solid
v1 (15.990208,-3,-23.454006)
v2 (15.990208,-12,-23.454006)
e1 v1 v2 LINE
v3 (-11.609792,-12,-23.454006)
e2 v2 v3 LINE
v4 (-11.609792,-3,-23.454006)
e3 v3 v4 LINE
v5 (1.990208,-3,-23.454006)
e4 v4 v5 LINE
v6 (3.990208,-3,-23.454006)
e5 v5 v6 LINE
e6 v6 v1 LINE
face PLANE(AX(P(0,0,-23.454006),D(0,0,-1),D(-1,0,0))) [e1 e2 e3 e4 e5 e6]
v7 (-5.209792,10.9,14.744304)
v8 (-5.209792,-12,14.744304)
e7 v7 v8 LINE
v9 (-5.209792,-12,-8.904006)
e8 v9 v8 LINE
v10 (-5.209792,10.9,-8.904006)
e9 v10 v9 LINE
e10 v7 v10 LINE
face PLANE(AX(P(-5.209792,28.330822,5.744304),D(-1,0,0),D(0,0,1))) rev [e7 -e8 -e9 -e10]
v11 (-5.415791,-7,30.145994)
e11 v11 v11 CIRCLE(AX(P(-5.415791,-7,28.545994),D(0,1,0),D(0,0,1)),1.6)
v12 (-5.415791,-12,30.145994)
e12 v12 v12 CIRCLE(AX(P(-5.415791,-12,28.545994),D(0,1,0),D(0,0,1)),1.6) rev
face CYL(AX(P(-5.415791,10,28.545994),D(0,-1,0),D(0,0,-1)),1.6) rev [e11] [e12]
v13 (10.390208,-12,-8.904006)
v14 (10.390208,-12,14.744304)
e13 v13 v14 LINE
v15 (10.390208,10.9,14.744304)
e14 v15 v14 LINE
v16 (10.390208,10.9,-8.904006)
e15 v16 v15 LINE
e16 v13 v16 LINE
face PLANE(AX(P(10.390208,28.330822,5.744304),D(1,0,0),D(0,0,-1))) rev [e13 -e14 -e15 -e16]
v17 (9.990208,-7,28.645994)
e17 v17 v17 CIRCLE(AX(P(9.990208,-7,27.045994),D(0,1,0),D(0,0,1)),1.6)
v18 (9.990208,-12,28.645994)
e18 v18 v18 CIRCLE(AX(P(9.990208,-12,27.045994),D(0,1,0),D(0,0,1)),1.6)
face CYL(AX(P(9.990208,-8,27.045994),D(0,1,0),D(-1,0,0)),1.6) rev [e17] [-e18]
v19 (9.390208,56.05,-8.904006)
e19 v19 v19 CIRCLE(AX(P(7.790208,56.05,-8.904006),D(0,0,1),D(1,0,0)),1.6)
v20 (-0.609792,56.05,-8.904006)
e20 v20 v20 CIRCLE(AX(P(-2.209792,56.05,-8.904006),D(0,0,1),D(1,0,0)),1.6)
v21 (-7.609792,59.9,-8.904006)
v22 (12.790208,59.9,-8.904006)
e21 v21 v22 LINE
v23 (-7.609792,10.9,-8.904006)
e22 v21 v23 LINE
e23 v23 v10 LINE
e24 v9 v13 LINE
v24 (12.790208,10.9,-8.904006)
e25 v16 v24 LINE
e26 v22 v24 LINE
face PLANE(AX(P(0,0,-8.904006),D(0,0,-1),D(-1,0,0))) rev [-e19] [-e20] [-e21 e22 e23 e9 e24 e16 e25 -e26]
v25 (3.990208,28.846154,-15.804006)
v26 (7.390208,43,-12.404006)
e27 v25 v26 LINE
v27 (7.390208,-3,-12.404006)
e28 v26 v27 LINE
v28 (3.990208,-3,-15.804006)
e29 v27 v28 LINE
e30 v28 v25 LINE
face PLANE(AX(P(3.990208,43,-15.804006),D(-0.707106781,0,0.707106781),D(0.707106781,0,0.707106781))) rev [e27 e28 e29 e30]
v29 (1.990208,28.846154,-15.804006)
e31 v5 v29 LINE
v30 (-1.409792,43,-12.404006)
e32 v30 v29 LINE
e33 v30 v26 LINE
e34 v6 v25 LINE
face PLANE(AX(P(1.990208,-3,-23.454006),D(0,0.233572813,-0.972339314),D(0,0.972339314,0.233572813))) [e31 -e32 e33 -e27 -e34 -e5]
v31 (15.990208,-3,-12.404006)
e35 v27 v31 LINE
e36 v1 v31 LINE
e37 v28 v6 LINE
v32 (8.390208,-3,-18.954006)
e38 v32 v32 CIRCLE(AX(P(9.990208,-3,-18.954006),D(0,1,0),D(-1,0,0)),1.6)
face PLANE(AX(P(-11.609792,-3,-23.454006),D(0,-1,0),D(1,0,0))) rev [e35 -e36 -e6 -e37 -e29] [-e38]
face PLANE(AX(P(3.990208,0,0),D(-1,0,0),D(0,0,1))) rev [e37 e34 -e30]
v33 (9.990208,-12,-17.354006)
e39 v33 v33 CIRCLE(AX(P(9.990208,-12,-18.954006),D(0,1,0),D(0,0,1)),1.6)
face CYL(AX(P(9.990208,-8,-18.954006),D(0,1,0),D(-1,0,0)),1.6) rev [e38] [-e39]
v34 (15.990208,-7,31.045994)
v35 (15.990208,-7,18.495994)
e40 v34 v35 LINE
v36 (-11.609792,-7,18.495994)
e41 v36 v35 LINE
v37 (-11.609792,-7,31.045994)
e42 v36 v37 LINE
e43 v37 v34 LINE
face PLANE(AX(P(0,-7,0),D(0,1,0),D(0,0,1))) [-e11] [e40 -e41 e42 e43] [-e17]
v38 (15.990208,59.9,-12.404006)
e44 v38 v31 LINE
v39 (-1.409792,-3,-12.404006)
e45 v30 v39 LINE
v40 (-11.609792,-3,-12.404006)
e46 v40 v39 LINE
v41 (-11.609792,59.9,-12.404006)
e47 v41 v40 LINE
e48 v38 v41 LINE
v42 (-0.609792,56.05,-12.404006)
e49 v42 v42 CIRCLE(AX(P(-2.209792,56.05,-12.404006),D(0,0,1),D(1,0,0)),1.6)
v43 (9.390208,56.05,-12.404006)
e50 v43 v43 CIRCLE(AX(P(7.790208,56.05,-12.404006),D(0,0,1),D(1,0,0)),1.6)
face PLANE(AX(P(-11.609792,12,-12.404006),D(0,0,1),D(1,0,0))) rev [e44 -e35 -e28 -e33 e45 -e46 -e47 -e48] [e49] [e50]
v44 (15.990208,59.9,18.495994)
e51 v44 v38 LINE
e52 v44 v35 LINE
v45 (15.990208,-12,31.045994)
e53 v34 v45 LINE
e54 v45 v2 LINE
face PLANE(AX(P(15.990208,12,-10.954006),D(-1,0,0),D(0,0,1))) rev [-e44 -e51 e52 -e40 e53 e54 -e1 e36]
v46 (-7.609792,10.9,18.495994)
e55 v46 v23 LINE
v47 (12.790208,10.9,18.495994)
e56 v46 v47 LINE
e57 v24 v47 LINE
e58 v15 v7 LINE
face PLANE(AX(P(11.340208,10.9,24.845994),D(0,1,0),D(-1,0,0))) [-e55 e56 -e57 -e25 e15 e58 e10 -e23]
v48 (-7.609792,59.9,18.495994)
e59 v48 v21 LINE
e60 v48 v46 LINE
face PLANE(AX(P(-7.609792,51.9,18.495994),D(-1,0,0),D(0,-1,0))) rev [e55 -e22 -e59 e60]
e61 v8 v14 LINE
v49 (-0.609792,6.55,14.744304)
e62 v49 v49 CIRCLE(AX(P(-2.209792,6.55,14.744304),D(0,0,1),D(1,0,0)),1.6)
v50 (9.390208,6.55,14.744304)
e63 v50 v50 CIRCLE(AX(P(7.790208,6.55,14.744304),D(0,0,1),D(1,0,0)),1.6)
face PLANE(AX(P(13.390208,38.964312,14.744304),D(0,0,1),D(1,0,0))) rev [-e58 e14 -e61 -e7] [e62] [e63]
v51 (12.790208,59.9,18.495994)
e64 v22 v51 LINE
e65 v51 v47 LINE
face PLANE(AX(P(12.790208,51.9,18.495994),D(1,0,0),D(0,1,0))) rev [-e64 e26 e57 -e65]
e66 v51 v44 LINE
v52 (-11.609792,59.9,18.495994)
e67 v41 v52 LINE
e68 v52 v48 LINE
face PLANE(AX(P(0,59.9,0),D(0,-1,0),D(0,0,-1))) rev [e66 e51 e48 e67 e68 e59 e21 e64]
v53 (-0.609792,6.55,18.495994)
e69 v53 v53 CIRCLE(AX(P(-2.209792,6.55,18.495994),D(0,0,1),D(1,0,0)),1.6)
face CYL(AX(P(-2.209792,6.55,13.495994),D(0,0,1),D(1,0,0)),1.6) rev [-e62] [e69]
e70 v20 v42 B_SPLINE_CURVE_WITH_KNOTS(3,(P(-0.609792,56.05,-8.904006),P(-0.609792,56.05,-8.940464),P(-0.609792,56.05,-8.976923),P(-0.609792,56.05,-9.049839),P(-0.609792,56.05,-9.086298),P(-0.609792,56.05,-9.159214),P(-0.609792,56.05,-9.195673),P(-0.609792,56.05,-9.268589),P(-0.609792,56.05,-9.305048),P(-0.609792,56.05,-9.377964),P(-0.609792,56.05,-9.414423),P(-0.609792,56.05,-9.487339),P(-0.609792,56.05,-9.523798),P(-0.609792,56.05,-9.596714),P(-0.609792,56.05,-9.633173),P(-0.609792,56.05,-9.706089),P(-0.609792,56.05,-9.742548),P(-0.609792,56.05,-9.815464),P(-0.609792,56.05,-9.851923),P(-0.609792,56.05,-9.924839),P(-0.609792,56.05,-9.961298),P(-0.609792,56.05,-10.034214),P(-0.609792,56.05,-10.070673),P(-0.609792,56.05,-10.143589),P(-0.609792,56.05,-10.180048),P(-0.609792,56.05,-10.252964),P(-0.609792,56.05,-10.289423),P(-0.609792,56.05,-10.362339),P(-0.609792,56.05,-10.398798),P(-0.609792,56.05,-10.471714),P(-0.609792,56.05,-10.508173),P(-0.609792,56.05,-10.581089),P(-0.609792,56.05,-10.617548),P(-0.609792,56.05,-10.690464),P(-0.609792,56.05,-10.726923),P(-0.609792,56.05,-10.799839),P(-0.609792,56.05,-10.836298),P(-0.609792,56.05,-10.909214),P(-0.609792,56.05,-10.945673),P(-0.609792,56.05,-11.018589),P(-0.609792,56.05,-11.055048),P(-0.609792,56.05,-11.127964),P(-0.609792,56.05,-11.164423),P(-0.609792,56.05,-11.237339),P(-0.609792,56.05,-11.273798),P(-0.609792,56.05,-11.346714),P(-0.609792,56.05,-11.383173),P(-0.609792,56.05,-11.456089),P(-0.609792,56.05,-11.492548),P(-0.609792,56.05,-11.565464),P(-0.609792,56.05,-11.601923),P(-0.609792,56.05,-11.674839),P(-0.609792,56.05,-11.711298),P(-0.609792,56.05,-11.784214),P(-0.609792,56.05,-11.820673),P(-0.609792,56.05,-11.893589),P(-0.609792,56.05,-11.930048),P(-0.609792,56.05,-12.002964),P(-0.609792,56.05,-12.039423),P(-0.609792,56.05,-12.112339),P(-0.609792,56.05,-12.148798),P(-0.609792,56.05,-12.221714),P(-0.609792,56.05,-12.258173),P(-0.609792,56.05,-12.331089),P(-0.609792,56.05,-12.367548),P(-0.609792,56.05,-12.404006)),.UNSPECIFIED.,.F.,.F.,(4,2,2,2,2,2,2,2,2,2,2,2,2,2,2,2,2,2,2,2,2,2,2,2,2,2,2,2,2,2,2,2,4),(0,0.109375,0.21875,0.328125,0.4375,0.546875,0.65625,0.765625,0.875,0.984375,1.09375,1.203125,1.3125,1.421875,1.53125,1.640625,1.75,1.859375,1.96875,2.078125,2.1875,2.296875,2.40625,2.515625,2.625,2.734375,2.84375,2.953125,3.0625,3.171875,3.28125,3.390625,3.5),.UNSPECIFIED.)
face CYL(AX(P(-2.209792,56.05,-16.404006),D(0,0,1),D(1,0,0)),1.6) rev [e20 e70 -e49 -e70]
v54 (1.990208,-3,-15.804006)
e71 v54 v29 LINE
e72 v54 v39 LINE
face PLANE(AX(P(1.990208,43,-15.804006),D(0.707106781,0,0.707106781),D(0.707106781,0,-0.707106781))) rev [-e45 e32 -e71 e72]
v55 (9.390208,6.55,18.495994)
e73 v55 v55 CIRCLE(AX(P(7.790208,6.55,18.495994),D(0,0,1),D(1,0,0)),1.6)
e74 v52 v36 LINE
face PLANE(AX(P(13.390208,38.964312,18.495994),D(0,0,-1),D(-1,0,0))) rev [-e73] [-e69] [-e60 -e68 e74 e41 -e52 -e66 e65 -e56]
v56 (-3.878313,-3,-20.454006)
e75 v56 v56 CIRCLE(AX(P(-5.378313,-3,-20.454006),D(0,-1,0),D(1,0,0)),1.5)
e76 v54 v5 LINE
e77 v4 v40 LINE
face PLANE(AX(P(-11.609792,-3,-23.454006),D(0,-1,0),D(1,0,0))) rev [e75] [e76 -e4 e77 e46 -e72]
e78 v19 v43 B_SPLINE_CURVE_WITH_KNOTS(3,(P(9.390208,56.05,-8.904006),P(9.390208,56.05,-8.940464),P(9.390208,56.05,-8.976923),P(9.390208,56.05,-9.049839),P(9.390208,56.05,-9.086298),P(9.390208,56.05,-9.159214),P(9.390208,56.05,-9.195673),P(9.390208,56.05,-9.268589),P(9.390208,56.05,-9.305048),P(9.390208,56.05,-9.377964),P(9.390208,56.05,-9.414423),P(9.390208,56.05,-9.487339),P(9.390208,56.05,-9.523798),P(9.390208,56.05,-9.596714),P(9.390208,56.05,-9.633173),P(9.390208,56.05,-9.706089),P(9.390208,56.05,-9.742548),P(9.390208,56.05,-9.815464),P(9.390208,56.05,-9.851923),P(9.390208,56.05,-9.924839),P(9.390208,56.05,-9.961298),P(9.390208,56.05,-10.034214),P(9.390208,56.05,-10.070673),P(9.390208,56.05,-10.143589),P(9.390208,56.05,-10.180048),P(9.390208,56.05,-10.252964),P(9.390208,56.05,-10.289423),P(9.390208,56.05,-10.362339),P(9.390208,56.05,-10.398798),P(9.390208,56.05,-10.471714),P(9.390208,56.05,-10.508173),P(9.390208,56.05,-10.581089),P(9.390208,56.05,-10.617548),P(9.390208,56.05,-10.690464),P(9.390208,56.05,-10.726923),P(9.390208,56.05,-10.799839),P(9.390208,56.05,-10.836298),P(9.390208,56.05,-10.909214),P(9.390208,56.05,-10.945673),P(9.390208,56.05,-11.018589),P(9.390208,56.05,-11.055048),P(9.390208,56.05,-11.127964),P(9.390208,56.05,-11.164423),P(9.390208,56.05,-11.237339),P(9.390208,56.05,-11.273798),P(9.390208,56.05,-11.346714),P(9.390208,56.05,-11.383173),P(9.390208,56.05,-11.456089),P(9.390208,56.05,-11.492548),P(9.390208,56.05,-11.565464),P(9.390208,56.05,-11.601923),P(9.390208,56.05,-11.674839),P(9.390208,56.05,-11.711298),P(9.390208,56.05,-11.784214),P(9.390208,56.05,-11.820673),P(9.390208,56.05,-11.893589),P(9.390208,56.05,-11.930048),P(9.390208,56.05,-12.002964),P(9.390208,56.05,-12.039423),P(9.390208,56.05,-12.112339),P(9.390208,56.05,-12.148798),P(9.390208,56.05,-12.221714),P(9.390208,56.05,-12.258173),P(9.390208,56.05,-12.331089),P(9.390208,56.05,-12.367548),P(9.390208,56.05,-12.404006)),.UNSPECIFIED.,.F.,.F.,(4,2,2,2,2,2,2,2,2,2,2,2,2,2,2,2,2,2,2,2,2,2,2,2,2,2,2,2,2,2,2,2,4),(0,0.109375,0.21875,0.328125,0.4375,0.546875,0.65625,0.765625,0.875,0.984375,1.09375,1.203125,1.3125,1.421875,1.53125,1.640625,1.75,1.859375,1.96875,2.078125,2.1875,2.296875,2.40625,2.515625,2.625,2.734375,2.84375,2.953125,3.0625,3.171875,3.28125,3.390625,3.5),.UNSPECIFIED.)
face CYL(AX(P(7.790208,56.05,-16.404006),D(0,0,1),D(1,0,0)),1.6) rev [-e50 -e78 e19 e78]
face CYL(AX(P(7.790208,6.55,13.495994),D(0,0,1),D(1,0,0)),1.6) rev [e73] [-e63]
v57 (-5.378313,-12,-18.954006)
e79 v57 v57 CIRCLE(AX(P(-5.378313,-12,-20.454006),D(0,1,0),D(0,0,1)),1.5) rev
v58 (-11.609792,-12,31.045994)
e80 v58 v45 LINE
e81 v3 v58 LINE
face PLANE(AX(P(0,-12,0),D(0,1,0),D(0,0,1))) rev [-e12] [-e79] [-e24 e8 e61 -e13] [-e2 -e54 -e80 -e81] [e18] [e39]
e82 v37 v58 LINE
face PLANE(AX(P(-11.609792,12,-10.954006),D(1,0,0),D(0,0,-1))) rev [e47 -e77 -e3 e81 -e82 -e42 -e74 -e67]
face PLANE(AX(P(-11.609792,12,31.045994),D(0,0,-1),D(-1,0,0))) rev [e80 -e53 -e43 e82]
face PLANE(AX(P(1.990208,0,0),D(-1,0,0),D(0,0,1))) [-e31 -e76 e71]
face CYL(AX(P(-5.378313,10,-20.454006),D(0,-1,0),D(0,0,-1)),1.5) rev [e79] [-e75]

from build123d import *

# Parameters (mm, degrees)
SKETCH1_W               = 25
SKETCH1_H               = 17
BOSS_EXTRUDE1_DEPTH     = 12
MOVE_FACE1_BY           = 15
MOVE_FACE3_BY           = 8
SKETCH3_W               = 25
SKETCH3_H               = 12.751689795
BOSS_EXTRUDE2_DEPTH     = 6.9
SKETCH4_W               = 5
SKETCH4_H               = 16.698310205
BOSS_EXTRUDE3_DEPTH     = 6.9
MOVE_START              = -11.609792285
MOVE_FACE4_OUTLINE_W    = 6.9
MOVE_FACE4_OUTLINE_H    = 16.698310205
MOVE_FACE4_DEPTH        = 2.4
MOVE_FACE5_BY           = 20
SKETCH6_W               = 25
SKETCH6_H               = 10.9
BOSS_EXTRUDE5_DEPTH     = 2
MOVE_FACE6_BY           = 1.5
MOVE_FACE7_BY           = 2.6
SKETCH7_W               = 3.8
SKETCH7_H               = 30.95
BOSS_EXTRUDE6_DEPTH     = 41
SKETCH8_W               = 16.2
SKETCH8_H               = 3.5
BOSS_EXTRUDE7_DEPTH     = 41
SKETCH9_W               = 3
SKETCH9_H               = 30.95
BOSS_EXTRUDE8_DEPTH     = 41
SKETCH10_W              = 4.6
SKETCH10_H              = 3.5
BOSS_EXTRUDE9_DEPTH     = 41
MOVE_FACE8_BY           = 9
MOVE_FACE9_OUTLINE_W    = 6
MOVE_FACE9_OUTLINE_H    = 6.301689795
MOVE_FACE9_OUTLINE_H_2  = 3.5
MOVE_FACE9_DEPTH        = 27.6
MOVE_START_2            = 8.390207715
MOVE_FACE9_2_OUTLINE_W  = 6
MOVE_FACE9_2_OUTLINE_H  = 23.698310205
MOVE_FACE9_2_DEPTH      = 7.6
MOVE_FACE9_3_OUTLINE_W  = 6
MOVE_FACE9_3_OUTLINE_H  = 23.698310205
MOVE_FACE9_3_DEPTH      = 7.4
MOVE_FACE10_BY          = 10
SKETCH11_W              = 27.6
SKETCH11_H              = 3
BOSS_EXTRUDE10_DEPTH    = 11
SKETCH12_R              = 1.5
SKETCH12_R_2            = 1.6
CUT_EXTRUDE1_DEPTH      = 16
SKETCH13_R              = 1.6
CUT_EXTRUDE2_DEPTH      = 5
CUT_EXTRUDE3_START      = -9
SKETCH14_R              = 1.6
CUT_EXTRUDE3_DEPTH      = 9
SKETCH15_R              = 1.6
CUT_EXTRUDE4_DEPTH      = 5
MOVE_FACE14_BY          = 1
MOVE_FACE15_OUTLINE_W   = 16.9
MOVE_FACE15_OUTLINE_H   = 23.698310205
MOVE_FACE15_DEPTH       = 2
MOVE_FACE16_BY          = 8
MOVE_FACE17_BY          = 6
MOVE_FACE19_BY          = 6
MOVE_FACE20_BY          = 5
MOVE_FACE21_BY          = 0.2
MOVE_FACE22_BY          = 0.2
MOVE_START_3            = -12.454005935
MOVE_FACE23_OUTLINE_W   = 27.6
MOVE_FACE23_OUTLINE_H   = 62.9
MOVE_FACE23_DEPTH       = 0.05
MOVE_FACE24_BY          = 0.05
SKETCH17_R              = 1.6
CUT_EXTRUDE5_DEPTH      = 7.5
BOSS_EXTRUDE12_DEPTH    = 2
BOSS_EXTRUDE13_DEPTH    = 46
CUT_EXTRUDE6_DEPTH      = 70.24755409
CUT_EXTRUDE6_DEPTH_BACK = 70.24755409


# Read off the part's stored shape, not the designer's step: Move Face4, Move Face9, Move Face15, Move Face23
with BuildPart() as part:
    # Sketch1 → Boss-Extrude1 (new body)
    with BuildSketch(Plane(origin=(0, 0, 0), x_dir=(1, 0, 0), z_dir=(0, 1, 0))):
        with Locations((0.890207715, 2.454005935)):
            Rectangle(SKETCH1_W, SKETCH1_H)
    extrude(amount=BOSS_EXTRUDE1_DEPTH)

    # Move Face1: a face moved outward by 15.0
    extrude(part.faces().sort_by_distance((0.890207715, 6, 6.045994065))[0], amount=MOVE_FACE1_BY, dir=(0, 0, 1))

    # Move Face3: a face moved inward by 8.0
    extrude(part.faces().sort_by_distance((0.890207715, 12, 5.045994065))[0], amount=MOVE_FACE3_BY, dir=(0, -1, 0), mode=Mode.SUBTRACT)

    # Sketch3 → Boss-Extrude2 (add)
    with BuildSketch(Plane(origin=(0, 4, 0), x_dir=(1, 0, 0), z_dir=(0, 1, 0))):
        with Locations((0.890207715, -12.120149168)):
            Rectangle(SKETCH3_W, SKETCH3_H)
    extrude(amount=BOSS_EXTRUDE2_DEPTH)

    # Sketch4 → Boss-Extrude3 (add)
    with BuildSketch(Plane(origin=(0, 4, 0), x_dir=(1, 0, 0), z_dir=(0, 1, 0))):
        with Locations((10.890207715, 2.604850833)):
            Rectangle(SKETCH4_W, SKETCH4_H)
        with Locations((-6.709792285, 2.604850833)):
            Rectangle(SKETCH4_W, SKETCH4_H)
    extrude(amount=BOSS_EXTRUDE3_DEPTH)

    # Move Face4 outline → Move Face4 (add)
    with BuildSketch(Plane.YZ.offset(MOVE_START)):
        with Locations((7.45, -2.604850833)):
            Rectangle(MOVE_FACE4_OUTLINE_W, MOVE_FACE4_OUTLINE_H)
    extrude(amount=MOVE_FACE4_DEPTH)

    # Move Face5: a face moved inward by 20.0
    extrude(part.faces().sort_by_distance((2.090207715, 4, -2.604850832))[0], amount=MOVE_FACE5_BY, dir=(0, -1, 0), mode=Mode.SUBTRACT)

    # Sketch6 → Boss-Extrude5 (add)
    with BuildSketch(Plane(origin=(0, 0, -10.954005935), x_dir=(-1, 0, 0), z_dir=(0, 0, -1))):
        with Locations((-0.890207715, 5.45)):
            Rectangle(SKETCH6_W, SKETCH6_H)
    extrude(amount=-BOSS_EXTRUDE5_DEPTH)

    # Move Face6: a face moved outward by 1.5
    extrude(part.faces().sort_by_distance((0.890207715, 5.45, -10.954005935))[0], amount=MOVE_FACE6_BY, dir=(0, 0, -1))

    # Move Face7: a face moved outward by 2.6
    extrude(part.faces().sort_by_distance((13.390207715, 5.348749838, 3.512570938))[0], amount=MOVE_FACE7_BY, dir=(1, 0, 0))

    # Sketch7 → Boss-Extrude6 (add)
    with BuildSketch(Plane(origin=(0, 10.9, 0), x_dir=(1, 0, 0), z_dir=(0, 1, 0))):
        with Locations((-9.709792285, -3.020994065)):
            Rectangle(SKETCH7_W, SKETCH7_H)
    extrude(amount=BOSS_EXTRUDE6_DEPTH)

    # Sketch8 → Boss-Extrude7 (add)
    with BuildSketch(Plane(origin=(0, 10.9, 0), x_dir=(1, 0, 0), z_dir=(0, 1, 0))):
        with Locations((0.290207715, 10.704005935)):
            Rectangle(SKETCH8_W, SKETCH8_H)
    extrude(amount=BOSS_EXTRUDE7_DEPTH)

    # Sketch9 → Boss-Extrude8 (add)
    with BuildSketch(Plane(origin=(0, 10.9, 0), x_dir=(1, 0, 0), z_dir=(0, 1, 0))):
        with Locations((14.490207715, -3.020994065)):
            Rectangle(SKETCH9_W, SKETCH9_H)
    extrude(amount=BOSS_EXTRUDE8_DEPTH)

    # Sketch10 → Boss-Extrude9 (add)
    with BuildSketch(Plane(origin=(0, 10.9, 0), x_dir=(1, 0, 0), z_dir=(0, 1, 0))):
        with Locations((10.690207715, 10.704005935)):
            Rectangle(SKETCH10_W, SKETCH10_H)
    extrude(amount=BOSS_EXTRUDE9_DEPTH)

    # Move Face8: a face moved inward by 9.0
    extrude(part.faces().sort_by_distance((2.090207715, 5.45, 5.74430427))[0], amount=MOVE_FACE8_BY, dir=(0, 0, 1), mode=Mode.SUBTRACT)

    # Move Face9 outline → Move Face9 (add)
    with BuildSketch(Plane.YZ.offset(MOVE_START)):
        with Locations((-3, 17.895149168)):
            Rectangle(MOVE_FACE9_OUTLINE_W, MOVE_FACE9_OUTLINE_H)
        with Locations((-3, -10.704005935)):
            Rectangle(MOVE_FACE9_OUTLINE_W, MOVE_FACE9_OUTLINE_H_2)
    extrude(amount=MOVE_FACE9_DEPTH)

    # Move Face9 2 outline → Move Face9 2 (add)
    with BuildSketch(Plane.YZ.offset(MOVE_START_2)):
        with Locations((-3, 2.895149167)):
            Rectangle(MOVE_FACE9_2_OUTLINE_W, MOVE_FACE9_2_OUTLINE_H)
    extrude(amount=MOVE_FACE9_2_DEPTH)

    # Move Face9 3 outline → Move Face9 3 (add)
    with BuildSketch(Plane.YZ.offset(MOVE_START)):
        with Locations((-3, 2.895149167)):
            Rectangle(MOVE_FACE9_3_OUTLINE_W, MOVE_FACE9_3_OUTLINE_H)
    extrude(amount=MOVE_FACE9_3_DEPTH)

    # Move Face10: a face moved outward by 10.0
    extrude(part.faces().sort_by_distance((2.190207715, -1, 21.045994065))[0], amount=MOVE_FACE10_BY, dir=(0, 0, 1))

    # Sketch11 → Boss-Extrude10 (add)
    with BuildSketch(Plane(origin=(0, 0, -12.454005935), x_dir=(-1, 0, 0), z_dir=(0, 0, -1))):
        with Locations((-2.190207715, -4.5)):
            Rectangle(SKETCH11_W, SKETCH11_H)
    extrude(amount=BOSS_EXTRUDE10_DEPTH)

    # Sketch12 → Cut-Extrude1 (cut)
    with BuildSketch(Plane.XZ.offset(6)):
        with Locations(Location((-5.378312816, -20.454005935, 0), (0, 0, 270))):
            Circle(SKETCH12_R)
        with Locations(Location((-5.415791402, 28.545994065, 0), (0, 0, 270))):
            Circle(SKETCH12_R_2)
    extrude(amount=-CUT_EXTRUDE1_DEPTH, mode=Mode.SUBTRACT)

    # Sketch13 → Cut-Extrude2 (cut)
    with BuildSketch(Plane(origin=(0, -3, 0), x_dir=(1, 0, 0), z_dir=(0, 1, 0))):
        with Locations(Location((9.990207715, 18.954005935, 0), (0, 0, 180))):
            Circle(SKETCH13_R)
        with Locations(Location((9.990207715, -27.045994065, 0), (0, 0, 180))):
            Circle(SKETCH13_R)
    extrude(amount=-CUT_EXTRUDE2_DEPTH, mode=Mode.SUBTRACT)

    # Sketch14 → Cut-Extrude3 (cut)
    with BuildSketch(Plane.XZ.offset(3).offset(CUT_EXTRUDE3_START)):
        with Locations(Location((9.990207715, 27.045994065, 0), (0, 0, 90))):
            Circle(SKETCH14_R)
    extrude(amount=CUT_EXTRUDE3_DEPTH, mode=Mode.SUBTRACT)

    # Sketch15 → Cut-Extrude4 (cut)
    with BuildSketch(Plane.XY.offset(18.495994065)):
        with Locations((-2.209792285, 6.55)):
            Circle(SKETCH15_R)
        with Locations((7.790207715, 6.55)):
            Circle(SKETCH15_R)
    extrude(amount=-CUT_EXTRUDE4_DEPTH, mode=Mode.SUBTRACT)

    # Move Face14: a face moved inward by 1.0
    extrude(part.faces().sort_by_distance((-4.209792285, 2.45, 2.895149168))[0], amount=MOVE_FACE14_BY, dir=(-1, 0, 0), mode=Mode.SUBTRACT)

    # Move Face15 outline → Move Face15 (cut)
    with BuildSketch(Plane.YZ.offset(MOVE_START_2)):
        with Locations((2.45, 2.895149167)):
            Rectangle(MOVE_FACE15_OUTLINE_W, MOVE_FACE15_OUTLINE_H)
    extrude(amount=MOVE_FACE15_DEPTH, mode=Mode.SUBTRACT)

    # Move Face16: a face moved outward by 8.0
    extrude(part.faces().sort_by_distance((2.190207715, 51.9, -9.359005935))[0], amount=MOVE_FACE16_BY, dir=(0, 1, 0))

    # Move Face17: a face moved inward by 6.0
    extrude(part.faces().sort_by_distance((2.185483915, 4, 24.62368036))[0], amount=MOVE_FACE17_BY, dir=(0, -1, 0), mode=Mode.SUBTRACT)

    # Move Face19: a face moved outward by 6.0
    extrude(part.faces().sort_by_distance((13.230207715, -6, 3.795994065))[0], amount=MOVE_FACE19_BY, dir=(0, -1, 0))

    # Move Face20: a face moved inward by 5.0
    extrude(part.faces().sort_by_distance((2.185483915, -2, 24.62368036))[0], amount=MOVE_FACE20_BY, dir=(0, -1, 0), mode=Mode.SUBTRACT)

    # Move Face21: a face moved outward by 0.2
    extrude(part.faces().sort_by_distance((-7.809792285, 35.4, 4.770994065))[0], amount=MOVE_FACE21_BY, dir=(1, 0, 0))

    # Move Face22: a face moved outward by 0.2
    extrude(part.faces().sort_by_distance((12.990207715, 35.4, 4.770994065))[0], amount=MOVE_FACE22_BY, dir=(-1, 0, 0))

    # Move Face23 outline → Move Face23 (cut)
    with BuildSketch(Plane.XY.offset(MOVE_START_3)):
        with Locations((2.190207715, 28.45)):
            Rectangle(MOVE_FACE23_OUTLINE_W, MOVE_FACE23_OUTLINE_H)
    extrude(amount=MOVE_FACE23_DEPTH, mode=Mode.SUBTRACT)

    # Move Face24: a face moved outward by 0.05
    extrude(part.faces().sort_by_distance((2.590207715, 25.934788184, -8.954005935))[0], amount=MOVE_FACE24_BY, dir=(0, 0, 1))

    # Sketch17 → Cut-Extrude5 (cut)
    with BuildSketch(Plane.XY.offset(-8.904005935)):
        with Locations((-2.209792285, 56.05)):
            Circle(SKETCH17_R)
        with Locations((7.790207715, 56.05)):
            Circle(SKETCH17_R)
    extrude(amount=-CUT_EXTRUDE5_DEPTH, mode=Mode.SUBTRACT)

    # Sketch19 → Boss-Extrude12 (add)
    with BuildSketch(Plane(origin=(3.990207715, 0, 0), x_dir=(0, 0, -1), z_dir=(1, 0, 0))):
        Polygon((23.454005935, -3), (12.404005935, 43), (12.404005935, -3), align=None)
    extrude(amount=-BOSS_EXTRUDE12_DEPTH)

    # Sketch20 → Boss-Extrude13 (add)
    with BuildSketch(Plane(origin=(0, -3, 0), x_dir=(1, 0, 0), z_dir=(0, 1, 0))):
        Polygon((1.990207715, 15.804005935), (-1.409792285, 12.404005935), (1.990207715, 12.404005935), align=None)
        Polygon((3.990207715, 15.804005935), (7.390207715, 12.404005935), (3.990207715, 12.404005935), align=None)
    extrude(amount=BOSS_EXTRUDE13_DEPTH)

    # Sketch21 → Cut-Extrude6 (cut, two sides: drawn at the far end of the back side and taken through both)
    with BuildSketch(Plane(origin=(3.990207715, 0, 0), x_dir=(0, 0, -1), z_dir=(1, 0, 0)).offset(-CUT_EXTRUDE6_DEPTH_BACK)):
        Polygon((15.902869946, 28.434593255), (12.404005935, 43), (16.038201458, 43), align=None)
    extrude(amount=CUT_EXTRUDE6_DEPTH + CUT_EXTRUDE6_DEPTH_BACK, mode=Mode.SUBTRACT)


solid = part.part
